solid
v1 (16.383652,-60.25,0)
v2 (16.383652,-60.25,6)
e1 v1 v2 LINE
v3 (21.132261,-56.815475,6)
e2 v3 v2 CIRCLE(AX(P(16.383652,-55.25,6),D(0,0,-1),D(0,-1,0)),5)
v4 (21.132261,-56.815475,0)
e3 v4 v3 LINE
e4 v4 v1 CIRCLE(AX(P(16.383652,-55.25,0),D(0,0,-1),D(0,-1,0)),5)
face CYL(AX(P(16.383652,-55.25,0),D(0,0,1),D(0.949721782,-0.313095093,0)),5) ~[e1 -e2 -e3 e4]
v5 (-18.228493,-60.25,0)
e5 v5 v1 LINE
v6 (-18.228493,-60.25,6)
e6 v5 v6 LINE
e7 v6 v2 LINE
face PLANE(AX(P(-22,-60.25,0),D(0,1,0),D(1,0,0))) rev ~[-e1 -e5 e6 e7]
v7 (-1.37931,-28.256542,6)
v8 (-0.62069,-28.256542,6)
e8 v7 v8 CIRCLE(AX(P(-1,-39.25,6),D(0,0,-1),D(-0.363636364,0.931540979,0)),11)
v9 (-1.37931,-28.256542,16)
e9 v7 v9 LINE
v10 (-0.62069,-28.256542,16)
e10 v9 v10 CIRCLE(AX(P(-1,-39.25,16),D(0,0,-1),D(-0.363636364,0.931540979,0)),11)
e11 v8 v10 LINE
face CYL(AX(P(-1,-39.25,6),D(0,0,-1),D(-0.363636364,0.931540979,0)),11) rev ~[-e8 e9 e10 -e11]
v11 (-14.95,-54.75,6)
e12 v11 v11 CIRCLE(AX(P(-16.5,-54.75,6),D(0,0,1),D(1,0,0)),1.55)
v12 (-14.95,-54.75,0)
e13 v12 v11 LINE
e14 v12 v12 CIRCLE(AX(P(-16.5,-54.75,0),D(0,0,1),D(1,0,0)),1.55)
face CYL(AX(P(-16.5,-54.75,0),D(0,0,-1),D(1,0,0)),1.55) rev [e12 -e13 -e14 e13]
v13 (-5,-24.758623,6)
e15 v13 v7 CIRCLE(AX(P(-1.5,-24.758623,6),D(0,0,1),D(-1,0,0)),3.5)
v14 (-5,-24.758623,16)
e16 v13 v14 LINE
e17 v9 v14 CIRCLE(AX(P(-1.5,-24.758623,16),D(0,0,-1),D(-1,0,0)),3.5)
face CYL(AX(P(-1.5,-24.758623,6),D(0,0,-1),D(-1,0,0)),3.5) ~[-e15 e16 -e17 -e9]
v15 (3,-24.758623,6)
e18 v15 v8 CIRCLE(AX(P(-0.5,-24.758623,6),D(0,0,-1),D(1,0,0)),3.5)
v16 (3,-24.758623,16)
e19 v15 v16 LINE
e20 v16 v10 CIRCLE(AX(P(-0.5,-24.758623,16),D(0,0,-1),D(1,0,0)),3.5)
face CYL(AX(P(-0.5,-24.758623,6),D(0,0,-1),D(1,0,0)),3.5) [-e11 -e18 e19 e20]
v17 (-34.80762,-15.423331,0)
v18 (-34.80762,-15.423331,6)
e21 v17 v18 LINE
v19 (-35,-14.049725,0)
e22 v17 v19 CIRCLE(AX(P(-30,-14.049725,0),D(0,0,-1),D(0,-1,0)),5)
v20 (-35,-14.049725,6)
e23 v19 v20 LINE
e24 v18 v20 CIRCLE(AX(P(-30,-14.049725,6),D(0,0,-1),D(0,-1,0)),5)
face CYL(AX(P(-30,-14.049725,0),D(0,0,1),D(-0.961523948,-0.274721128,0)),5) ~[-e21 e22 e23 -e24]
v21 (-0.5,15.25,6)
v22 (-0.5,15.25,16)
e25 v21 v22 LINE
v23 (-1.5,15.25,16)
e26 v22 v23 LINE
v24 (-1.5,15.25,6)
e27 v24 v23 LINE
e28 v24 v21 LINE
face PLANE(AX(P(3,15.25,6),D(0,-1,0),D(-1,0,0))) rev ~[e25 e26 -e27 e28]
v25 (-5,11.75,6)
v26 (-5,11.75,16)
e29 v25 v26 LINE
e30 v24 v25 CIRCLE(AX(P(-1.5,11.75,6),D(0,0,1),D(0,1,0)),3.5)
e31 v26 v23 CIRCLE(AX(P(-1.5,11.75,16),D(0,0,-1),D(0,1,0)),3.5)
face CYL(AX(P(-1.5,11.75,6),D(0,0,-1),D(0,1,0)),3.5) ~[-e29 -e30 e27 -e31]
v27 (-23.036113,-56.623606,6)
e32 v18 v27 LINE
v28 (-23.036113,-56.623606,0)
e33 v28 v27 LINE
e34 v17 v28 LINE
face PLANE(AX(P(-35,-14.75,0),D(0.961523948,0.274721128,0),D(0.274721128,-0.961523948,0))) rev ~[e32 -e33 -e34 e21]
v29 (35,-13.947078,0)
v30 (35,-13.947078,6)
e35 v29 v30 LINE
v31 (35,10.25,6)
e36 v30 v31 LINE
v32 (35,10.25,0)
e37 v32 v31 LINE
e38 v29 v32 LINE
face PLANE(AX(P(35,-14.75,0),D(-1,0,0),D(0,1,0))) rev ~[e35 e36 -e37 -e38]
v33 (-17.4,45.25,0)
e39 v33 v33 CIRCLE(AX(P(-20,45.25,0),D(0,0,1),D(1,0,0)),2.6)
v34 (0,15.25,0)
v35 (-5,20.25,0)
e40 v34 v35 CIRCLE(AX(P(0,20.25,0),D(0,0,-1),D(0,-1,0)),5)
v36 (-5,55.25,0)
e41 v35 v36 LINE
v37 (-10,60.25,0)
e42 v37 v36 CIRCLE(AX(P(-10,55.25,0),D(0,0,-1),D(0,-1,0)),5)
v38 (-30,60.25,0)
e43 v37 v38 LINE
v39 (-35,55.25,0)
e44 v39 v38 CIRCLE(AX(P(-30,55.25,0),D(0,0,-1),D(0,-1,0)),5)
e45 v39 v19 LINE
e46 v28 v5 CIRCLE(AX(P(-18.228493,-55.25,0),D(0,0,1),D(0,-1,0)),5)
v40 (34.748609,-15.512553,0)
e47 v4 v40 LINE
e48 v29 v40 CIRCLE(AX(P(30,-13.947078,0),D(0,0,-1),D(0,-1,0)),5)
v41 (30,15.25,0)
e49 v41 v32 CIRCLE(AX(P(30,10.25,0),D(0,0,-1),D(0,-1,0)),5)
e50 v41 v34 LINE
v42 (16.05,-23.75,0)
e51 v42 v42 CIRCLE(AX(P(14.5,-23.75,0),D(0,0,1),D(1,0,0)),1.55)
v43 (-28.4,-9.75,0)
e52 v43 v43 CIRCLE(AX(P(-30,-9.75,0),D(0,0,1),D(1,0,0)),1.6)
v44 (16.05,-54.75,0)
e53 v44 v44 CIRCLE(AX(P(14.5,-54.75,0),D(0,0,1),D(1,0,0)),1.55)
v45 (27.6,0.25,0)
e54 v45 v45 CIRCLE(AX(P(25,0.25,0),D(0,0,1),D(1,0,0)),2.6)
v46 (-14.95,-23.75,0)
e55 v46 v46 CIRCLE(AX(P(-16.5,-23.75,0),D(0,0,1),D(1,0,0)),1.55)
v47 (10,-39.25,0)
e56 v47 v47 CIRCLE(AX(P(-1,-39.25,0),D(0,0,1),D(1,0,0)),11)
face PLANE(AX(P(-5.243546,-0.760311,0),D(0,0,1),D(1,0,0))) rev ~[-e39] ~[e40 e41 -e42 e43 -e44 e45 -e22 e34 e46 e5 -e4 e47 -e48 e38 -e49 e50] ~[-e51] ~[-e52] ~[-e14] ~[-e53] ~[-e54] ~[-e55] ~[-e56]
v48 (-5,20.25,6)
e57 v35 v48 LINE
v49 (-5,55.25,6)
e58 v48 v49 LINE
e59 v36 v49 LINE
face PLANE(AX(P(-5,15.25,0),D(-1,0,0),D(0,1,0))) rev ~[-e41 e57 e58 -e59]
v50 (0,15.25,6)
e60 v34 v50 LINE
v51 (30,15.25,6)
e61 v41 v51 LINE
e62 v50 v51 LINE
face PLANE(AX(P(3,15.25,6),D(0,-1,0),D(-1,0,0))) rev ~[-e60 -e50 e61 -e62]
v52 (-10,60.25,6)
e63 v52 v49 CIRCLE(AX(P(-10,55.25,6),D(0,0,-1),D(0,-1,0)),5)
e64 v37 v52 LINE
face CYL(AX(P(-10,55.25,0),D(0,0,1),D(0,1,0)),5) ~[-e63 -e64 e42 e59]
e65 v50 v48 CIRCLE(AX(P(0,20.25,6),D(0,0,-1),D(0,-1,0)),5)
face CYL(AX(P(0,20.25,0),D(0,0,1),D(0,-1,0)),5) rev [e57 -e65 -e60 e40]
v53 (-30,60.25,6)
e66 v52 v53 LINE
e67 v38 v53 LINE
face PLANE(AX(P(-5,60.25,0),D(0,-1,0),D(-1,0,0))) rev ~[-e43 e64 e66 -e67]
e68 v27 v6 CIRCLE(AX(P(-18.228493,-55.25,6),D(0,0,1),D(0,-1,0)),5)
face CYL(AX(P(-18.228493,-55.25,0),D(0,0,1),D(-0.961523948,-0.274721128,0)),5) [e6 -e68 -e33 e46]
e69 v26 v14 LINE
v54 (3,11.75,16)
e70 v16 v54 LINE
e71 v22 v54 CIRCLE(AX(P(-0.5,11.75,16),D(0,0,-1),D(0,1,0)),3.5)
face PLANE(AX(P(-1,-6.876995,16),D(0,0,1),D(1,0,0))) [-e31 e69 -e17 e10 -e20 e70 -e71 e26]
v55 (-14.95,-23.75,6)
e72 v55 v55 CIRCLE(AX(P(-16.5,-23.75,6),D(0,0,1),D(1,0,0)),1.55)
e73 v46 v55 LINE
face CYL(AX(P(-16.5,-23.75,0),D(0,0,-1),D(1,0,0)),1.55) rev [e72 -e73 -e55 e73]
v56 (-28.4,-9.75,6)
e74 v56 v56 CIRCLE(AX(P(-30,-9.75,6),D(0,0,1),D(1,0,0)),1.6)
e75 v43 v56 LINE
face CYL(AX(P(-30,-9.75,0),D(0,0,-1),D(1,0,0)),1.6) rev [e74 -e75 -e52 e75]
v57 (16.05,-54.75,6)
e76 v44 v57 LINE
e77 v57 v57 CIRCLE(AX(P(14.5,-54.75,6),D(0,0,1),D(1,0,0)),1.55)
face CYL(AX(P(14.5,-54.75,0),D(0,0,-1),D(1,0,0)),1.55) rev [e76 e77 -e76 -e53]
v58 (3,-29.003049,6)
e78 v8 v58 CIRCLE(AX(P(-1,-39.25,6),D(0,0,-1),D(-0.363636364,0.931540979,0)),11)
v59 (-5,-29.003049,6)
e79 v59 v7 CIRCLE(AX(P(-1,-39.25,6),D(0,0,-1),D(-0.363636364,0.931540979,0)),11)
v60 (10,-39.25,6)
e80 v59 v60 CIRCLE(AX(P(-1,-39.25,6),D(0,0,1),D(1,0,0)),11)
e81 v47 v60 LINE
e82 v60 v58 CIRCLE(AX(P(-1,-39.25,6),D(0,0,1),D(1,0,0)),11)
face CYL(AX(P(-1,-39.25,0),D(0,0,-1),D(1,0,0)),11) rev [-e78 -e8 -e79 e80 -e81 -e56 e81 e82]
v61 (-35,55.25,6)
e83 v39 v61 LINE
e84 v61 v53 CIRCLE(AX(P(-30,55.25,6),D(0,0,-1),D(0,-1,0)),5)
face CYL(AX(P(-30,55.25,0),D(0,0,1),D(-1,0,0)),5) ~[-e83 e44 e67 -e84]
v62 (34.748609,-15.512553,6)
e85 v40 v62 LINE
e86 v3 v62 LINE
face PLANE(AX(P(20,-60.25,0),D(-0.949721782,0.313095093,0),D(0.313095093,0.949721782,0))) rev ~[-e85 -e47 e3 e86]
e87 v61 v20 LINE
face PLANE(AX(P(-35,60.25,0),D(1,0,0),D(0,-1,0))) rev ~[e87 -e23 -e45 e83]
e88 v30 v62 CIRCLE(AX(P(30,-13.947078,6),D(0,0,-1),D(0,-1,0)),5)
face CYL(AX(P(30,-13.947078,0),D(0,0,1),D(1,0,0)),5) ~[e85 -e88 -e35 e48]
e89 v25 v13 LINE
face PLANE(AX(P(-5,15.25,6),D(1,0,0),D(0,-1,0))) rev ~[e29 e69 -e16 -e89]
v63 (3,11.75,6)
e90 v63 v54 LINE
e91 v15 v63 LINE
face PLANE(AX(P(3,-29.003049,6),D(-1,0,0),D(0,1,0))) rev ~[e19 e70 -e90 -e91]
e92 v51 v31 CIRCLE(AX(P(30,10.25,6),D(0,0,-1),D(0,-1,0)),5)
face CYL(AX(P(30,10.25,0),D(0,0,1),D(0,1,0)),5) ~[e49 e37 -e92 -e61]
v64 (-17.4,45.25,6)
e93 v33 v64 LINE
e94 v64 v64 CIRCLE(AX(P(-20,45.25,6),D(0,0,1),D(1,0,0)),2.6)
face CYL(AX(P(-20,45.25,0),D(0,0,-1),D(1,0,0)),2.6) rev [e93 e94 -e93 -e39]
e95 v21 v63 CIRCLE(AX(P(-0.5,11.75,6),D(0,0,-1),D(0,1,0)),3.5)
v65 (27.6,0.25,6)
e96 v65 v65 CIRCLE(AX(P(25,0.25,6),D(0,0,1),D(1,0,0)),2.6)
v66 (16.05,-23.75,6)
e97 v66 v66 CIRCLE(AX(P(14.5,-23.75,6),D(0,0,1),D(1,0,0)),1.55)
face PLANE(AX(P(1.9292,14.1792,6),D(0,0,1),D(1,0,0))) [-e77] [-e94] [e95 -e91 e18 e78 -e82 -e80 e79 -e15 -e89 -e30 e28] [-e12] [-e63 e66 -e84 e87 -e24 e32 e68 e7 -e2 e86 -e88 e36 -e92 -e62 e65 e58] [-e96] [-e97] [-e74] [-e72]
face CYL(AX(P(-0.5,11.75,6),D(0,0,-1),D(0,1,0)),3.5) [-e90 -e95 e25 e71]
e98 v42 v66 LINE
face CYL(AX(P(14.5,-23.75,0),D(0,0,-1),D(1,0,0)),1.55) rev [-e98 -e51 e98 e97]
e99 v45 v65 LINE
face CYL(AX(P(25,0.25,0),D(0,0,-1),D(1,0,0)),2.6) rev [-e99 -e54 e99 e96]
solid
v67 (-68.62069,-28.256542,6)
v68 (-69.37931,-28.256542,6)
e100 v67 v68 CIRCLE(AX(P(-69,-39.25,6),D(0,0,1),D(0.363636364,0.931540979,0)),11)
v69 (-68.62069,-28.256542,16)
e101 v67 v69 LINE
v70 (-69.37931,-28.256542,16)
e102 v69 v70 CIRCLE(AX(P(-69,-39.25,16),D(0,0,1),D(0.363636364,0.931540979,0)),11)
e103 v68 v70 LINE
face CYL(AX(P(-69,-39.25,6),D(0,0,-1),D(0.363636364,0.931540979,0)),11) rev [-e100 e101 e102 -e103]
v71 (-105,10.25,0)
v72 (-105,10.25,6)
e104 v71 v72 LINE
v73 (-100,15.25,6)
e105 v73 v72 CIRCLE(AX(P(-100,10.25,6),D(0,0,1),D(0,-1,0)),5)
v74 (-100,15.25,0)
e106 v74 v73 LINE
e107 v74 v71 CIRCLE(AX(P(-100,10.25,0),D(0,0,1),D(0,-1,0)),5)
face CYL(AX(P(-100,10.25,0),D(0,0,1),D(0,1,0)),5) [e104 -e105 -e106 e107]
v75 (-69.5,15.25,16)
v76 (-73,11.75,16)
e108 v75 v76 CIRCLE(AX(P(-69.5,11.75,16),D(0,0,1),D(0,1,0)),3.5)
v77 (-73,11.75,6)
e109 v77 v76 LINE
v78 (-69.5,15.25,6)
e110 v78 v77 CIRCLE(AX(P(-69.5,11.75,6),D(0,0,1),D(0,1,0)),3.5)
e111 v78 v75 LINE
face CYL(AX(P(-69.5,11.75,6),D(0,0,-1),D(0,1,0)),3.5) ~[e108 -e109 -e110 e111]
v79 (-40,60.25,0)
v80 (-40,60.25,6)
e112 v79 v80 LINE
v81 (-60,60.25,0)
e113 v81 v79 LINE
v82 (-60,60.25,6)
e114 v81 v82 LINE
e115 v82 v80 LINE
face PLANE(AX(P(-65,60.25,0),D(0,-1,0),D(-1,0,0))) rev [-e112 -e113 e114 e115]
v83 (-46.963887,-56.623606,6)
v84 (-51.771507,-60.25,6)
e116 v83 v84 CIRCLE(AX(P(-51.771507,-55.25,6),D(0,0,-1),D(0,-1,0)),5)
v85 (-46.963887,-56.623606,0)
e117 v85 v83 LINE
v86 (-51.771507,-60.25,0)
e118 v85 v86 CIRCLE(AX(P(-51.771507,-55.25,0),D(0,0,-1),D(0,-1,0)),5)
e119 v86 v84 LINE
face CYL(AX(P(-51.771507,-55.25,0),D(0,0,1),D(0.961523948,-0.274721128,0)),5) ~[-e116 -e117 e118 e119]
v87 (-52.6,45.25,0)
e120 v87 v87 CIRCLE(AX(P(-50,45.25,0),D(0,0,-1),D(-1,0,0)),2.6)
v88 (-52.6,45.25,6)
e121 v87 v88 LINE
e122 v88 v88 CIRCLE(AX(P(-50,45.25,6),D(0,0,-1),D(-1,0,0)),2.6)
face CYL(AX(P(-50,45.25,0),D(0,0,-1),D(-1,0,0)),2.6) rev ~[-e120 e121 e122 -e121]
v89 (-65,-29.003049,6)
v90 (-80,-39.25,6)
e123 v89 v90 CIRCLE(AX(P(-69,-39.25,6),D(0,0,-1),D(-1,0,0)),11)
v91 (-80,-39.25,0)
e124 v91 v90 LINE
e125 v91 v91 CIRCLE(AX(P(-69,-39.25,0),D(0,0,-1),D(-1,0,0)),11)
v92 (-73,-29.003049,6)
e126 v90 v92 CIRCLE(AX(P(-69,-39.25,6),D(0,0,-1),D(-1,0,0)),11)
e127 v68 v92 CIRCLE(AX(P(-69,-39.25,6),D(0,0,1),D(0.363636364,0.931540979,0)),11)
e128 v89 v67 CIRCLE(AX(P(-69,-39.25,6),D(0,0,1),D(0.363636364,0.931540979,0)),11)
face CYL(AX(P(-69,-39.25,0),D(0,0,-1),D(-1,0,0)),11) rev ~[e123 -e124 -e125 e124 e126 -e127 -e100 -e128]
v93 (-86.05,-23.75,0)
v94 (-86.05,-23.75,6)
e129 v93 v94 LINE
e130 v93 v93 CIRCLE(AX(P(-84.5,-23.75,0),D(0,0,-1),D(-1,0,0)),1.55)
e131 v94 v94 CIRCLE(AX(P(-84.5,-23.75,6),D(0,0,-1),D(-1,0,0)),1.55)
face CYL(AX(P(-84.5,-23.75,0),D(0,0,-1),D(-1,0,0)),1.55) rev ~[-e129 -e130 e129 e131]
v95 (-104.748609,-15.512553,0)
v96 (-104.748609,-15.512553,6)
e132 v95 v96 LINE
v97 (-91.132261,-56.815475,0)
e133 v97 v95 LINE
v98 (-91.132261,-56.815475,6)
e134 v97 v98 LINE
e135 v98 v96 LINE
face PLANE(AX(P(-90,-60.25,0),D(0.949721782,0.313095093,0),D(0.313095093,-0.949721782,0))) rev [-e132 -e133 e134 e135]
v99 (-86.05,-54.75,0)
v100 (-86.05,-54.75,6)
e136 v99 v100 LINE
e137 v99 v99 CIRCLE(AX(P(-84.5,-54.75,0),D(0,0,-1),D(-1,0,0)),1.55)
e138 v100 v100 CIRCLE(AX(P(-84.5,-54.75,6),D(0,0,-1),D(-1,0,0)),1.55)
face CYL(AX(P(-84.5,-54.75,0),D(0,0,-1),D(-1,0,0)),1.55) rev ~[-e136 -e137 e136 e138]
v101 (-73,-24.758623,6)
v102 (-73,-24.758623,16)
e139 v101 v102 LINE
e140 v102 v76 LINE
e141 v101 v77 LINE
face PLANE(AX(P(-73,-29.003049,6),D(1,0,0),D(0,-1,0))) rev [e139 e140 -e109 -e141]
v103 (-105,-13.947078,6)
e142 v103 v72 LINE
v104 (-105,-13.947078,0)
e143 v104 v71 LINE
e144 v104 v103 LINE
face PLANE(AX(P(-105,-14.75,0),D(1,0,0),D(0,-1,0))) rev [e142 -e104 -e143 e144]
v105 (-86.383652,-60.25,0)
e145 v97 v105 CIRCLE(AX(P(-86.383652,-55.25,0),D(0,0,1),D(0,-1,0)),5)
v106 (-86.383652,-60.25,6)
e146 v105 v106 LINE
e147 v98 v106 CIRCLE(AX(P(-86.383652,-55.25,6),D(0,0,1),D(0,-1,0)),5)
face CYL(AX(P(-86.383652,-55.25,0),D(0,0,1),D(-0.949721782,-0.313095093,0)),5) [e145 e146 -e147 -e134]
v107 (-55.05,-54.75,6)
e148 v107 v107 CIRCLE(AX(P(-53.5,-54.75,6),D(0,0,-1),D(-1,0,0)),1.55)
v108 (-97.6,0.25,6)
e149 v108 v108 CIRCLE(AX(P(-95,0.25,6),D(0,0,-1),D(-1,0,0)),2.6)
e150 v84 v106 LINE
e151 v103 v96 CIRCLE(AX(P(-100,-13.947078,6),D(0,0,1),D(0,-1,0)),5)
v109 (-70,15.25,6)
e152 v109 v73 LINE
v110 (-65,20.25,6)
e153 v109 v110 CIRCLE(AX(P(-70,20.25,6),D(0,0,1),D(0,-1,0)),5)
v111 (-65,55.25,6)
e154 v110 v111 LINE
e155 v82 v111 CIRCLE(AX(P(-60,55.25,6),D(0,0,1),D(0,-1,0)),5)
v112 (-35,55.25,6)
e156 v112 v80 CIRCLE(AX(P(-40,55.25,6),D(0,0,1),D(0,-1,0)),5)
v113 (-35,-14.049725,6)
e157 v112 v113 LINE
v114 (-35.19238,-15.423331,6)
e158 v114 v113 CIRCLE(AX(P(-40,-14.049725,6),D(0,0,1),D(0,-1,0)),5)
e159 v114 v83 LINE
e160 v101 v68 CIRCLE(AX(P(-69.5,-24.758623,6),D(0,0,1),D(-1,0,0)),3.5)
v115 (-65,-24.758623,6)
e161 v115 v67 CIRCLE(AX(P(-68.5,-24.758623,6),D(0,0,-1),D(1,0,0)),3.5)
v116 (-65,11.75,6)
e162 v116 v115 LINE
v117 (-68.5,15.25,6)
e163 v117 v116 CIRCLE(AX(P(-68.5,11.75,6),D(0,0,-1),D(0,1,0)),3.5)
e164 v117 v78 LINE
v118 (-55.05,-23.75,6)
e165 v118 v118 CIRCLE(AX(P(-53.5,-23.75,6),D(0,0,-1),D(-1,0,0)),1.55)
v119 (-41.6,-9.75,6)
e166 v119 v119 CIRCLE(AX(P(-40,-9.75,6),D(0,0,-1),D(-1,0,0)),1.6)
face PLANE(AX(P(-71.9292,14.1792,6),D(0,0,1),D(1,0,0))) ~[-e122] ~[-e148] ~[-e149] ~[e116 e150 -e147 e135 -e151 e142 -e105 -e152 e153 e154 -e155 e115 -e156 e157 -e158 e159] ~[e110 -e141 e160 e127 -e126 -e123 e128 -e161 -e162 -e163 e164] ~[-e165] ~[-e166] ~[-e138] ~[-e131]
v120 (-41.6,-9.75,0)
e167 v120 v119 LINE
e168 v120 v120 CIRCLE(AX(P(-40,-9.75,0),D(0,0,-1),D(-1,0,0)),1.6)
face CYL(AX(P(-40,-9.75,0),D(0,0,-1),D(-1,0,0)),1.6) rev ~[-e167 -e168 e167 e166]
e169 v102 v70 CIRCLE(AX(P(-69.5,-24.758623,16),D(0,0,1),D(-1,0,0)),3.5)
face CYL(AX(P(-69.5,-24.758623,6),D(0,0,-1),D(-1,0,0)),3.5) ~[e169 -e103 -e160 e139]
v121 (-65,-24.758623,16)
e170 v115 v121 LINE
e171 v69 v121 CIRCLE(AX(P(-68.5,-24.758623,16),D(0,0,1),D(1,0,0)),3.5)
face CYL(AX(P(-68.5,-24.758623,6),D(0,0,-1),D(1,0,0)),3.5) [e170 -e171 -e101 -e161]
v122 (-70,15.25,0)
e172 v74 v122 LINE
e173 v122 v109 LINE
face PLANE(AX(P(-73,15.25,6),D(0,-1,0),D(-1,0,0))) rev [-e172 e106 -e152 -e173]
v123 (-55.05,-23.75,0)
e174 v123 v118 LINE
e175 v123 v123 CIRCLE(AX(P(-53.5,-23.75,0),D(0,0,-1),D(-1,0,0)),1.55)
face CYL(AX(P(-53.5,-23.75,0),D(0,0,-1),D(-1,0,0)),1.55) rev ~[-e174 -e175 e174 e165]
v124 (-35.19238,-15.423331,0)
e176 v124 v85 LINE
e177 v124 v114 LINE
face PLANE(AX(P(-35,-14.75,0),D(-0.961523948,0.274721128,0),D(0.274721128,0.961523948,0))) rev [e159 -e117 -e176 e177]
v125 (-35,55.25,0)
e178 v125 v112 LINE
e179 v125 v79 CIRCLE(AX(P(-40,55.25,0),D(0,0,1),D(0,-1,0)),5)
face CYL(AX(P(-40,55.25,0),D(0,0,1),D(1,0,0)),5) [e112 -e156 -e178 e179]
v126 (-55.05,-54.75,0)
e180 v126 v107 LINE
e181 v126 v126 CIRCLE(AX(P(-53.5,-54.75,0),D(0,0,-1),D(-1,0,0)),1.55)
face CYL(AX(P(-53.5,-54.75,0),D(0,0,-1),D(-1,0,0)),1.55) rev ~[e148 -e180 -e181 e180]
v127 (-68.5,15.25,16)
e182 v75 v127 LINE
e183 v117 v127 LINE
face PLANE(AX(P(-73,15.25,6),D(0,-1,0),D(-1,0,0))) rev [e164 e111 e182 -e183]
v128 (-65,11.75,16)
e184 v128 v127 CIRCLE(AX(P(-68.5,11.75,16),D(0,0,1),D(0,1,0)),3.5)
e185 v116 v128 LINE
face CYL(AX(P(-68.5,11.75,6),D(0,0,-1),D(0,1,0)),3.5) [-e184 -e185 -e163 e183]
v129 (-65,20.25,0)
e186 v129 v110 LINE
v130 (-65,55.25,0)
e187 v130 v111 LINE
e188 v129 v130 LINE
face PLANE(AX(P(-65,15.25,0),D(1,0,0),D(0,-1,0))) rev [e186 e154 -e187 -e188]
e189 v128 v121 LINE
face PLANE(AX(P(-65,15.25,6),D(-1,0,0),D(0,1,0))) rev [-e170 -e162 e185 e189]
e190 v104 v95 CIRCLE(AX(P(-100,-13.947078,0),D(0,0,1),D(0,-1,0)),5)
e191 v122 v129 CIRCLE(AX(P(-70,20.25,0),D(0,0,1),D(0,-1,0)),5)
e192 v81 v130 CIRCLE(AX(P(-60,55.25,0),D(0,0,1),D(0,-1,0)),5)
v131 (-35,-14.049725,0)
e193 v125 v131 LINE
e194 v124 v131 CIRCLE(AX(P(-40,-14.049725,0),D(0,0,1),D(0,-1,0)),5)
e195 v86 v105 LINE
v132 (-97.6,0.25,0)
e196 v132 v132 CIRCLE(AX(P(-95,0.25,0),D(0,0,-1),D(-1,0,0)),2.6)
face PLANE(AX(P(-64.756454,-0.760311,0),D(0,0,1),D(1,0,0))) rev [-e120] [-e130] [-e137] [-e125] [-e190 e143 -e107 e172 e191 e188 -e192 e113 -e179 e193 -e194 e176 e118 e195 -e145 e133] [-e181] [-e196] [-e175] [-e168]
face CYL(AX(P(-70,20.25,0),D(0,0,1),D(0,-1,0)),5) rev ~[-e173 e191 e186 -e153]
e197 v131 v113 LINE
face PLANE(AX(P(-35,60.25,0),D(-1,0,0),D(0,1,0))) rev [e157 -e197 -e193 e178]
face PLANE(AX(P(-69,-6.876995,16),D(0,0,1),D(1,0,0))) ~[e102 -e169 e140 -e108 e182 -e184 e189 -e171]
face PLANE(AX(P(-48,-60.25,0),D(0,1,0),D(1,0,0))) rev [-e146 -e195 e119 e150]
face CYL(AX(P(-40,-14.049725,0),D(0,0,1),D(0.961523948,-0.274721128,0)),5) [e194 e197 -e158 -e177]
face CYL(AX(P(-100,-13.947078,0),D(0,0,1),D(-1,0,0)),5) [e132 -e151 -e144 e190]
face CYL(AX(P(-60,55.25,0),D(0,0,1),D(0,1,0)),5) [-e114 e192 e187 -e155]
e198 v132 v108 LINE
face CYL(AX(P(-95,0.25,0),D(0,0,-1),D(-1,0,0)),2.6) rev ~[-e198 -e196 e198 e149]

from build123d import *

# Parameters (mm, degrees)
F0_R        = 1.55
F0_R_2      = 11
F0_R_3      = 1.6
F0_R_4      = 2.6
F1_DEPTH    = 6
F3_DEPTH    = 10
F4_R        = 5
F5_T1_DEPTH = 18.75
F5_T3_DEPTH = 20.6110649506


# Not quite as in the source:
# - a fillet or chamfer that OpenCascade refuses, or shapes differently, is made with other operations: its cross-section is extruded or revolved along the edge and cut away or added


with BuildPart() as f1:
    # F0 (on Top) → F1 (new body)
    with BuildSketch(Plane.XY):
        Polygon((-22, -60.25), (20, -60.25), (35, -14.75), (35, 15.25), (-5, 15.25), (-5, 60.25), (-35, 60.25), (-35, -14.75), align=None)
        with Locations((-16.5, -54.75)):
            Circle(F0_R, mode=Mode.SUBTRACT)
        with Locations((-1, -39.25)):
            Circle(F0_R_2, mode=Mode.SUBTRACT)
        with Locations((-30, -9.75)):
            Circle(F0_R_3, mode=Mode.SUBTRACT)
        with Locations((-16.5, -23.75)):
            Circle(F0_R, mode=Mode.SUBTRACT)
        with Locations((14.5, -54.75)):
            Circle(F0_R, mode=Mode.SUBTRACT)
        with Locations((14.5, -23.75)):
            Circle(F0_R, mode=Mode.SUBTRACT)
        with Locations((-20, 45.25)):
            Circle(F0_R_4, mode=Mode.SUBTRACT)
        with Locations((25, 0.25)):
            Circle(F0_R_4, mode=Mode.SUBTRACT)
    extrude(amount=F1_DEPTH)

    # F2 (on face) → F3 (join)
    with BuildSketch(Plane.XY.offset(6)):
        with BuildLine():
            ThreePointArc((-5, -29.003049234), (-1, -28.25), (3, -29.003049234))
            Line((3, -29.003049234), (3, 15.25))
            Line((3, 15.25), (-5, 15.25))
            Line((-5, 15.25), (-5, -29.003049234))
        make_face()
    extrude(amount=F3_DEPTH)

    # F4
    f4_edges = [f1.edges().sort_by_distance(p)[0] for p in [
        (-35, 60.25, 3),
        (-5, 60.25, 3),
        (35, 15.25, 3),
        (-5, 15.25, 3),
        (20, -60.25, 3),
        (-22, -60.25, 3),
        (35, -14.75, 3),
        (-35, -14.75, 3),
    ]]
    fillet(f4_edges, radius=F4_R)

    # F5: fillet of radius 3.5 on 4 edges, made by hand

    # F5_s2 → F5_t1 (cut)
    with BuildSketch(Plane.XY.offset(6)):
        with BuildLine():
            ThreePointArc((-1.5, 15.25), (-3.9748737342, 14.2248737342), (-5, 11.75))
            Line((-5, 11.75), (-5, 15.25))
            Line((-5, 15.25), (-1.5, 15.25))
        make_face()
        with BuildLine():
            ThreePointArc((-0.5, 15.25), (1.9748737342, 14.2248737342), (3, 11.75))
            Line((3, 11.75), (3, 15.25))
            Line((3, 15.25), (-0.5, 15.25))
        make_face()
    extrude(amount=F5_T1_DEPTH, mode=Mode.SUBTRACT)

    # F5_s4 → F5_t3 (cut)
    with BuildSketch(Plane.XY.offset(6)):
        with BuildLine():
            ThreePointArc((-5, -24.7586232538), (-3.9318291682, -27.2758055866), (-1.3793103448, -28.2565417788))
            ThreePointArc((-1.3793103448, -28.2565417788), (-3.221240221, -28.4766025841), (-5, -29.003049234))
            Line((-5, -29.003049234), (-5, -24.7586232538))
        make_face()
        with BuildLine():
            ThreePointArc((3, -24.7586232538), (1.9318291682, -27.2758055866), (-0.6206896552, -28.2565417788))
            ThreePointArc((-0.6206896552, -28.2565417788), (1.221240221, -28.4766025841), (3, -29.003049234))
            Line((3, -29.003049234), (3, -24.7586232538))
        make_face()
    extrude(amount=F5_T3_DEPTH, mode=Mode.SUBTRACT)


with BuildPart() as f6_1:
    # F6: instance of F1
    add(f1.part.mirror(Plane(origin=(-35, 20.6001373616, 3), x_dir=(0, -1, 0), z_dir=(-1, 0, 0))))


solid = Compound([f1.part, f6_1.part])
